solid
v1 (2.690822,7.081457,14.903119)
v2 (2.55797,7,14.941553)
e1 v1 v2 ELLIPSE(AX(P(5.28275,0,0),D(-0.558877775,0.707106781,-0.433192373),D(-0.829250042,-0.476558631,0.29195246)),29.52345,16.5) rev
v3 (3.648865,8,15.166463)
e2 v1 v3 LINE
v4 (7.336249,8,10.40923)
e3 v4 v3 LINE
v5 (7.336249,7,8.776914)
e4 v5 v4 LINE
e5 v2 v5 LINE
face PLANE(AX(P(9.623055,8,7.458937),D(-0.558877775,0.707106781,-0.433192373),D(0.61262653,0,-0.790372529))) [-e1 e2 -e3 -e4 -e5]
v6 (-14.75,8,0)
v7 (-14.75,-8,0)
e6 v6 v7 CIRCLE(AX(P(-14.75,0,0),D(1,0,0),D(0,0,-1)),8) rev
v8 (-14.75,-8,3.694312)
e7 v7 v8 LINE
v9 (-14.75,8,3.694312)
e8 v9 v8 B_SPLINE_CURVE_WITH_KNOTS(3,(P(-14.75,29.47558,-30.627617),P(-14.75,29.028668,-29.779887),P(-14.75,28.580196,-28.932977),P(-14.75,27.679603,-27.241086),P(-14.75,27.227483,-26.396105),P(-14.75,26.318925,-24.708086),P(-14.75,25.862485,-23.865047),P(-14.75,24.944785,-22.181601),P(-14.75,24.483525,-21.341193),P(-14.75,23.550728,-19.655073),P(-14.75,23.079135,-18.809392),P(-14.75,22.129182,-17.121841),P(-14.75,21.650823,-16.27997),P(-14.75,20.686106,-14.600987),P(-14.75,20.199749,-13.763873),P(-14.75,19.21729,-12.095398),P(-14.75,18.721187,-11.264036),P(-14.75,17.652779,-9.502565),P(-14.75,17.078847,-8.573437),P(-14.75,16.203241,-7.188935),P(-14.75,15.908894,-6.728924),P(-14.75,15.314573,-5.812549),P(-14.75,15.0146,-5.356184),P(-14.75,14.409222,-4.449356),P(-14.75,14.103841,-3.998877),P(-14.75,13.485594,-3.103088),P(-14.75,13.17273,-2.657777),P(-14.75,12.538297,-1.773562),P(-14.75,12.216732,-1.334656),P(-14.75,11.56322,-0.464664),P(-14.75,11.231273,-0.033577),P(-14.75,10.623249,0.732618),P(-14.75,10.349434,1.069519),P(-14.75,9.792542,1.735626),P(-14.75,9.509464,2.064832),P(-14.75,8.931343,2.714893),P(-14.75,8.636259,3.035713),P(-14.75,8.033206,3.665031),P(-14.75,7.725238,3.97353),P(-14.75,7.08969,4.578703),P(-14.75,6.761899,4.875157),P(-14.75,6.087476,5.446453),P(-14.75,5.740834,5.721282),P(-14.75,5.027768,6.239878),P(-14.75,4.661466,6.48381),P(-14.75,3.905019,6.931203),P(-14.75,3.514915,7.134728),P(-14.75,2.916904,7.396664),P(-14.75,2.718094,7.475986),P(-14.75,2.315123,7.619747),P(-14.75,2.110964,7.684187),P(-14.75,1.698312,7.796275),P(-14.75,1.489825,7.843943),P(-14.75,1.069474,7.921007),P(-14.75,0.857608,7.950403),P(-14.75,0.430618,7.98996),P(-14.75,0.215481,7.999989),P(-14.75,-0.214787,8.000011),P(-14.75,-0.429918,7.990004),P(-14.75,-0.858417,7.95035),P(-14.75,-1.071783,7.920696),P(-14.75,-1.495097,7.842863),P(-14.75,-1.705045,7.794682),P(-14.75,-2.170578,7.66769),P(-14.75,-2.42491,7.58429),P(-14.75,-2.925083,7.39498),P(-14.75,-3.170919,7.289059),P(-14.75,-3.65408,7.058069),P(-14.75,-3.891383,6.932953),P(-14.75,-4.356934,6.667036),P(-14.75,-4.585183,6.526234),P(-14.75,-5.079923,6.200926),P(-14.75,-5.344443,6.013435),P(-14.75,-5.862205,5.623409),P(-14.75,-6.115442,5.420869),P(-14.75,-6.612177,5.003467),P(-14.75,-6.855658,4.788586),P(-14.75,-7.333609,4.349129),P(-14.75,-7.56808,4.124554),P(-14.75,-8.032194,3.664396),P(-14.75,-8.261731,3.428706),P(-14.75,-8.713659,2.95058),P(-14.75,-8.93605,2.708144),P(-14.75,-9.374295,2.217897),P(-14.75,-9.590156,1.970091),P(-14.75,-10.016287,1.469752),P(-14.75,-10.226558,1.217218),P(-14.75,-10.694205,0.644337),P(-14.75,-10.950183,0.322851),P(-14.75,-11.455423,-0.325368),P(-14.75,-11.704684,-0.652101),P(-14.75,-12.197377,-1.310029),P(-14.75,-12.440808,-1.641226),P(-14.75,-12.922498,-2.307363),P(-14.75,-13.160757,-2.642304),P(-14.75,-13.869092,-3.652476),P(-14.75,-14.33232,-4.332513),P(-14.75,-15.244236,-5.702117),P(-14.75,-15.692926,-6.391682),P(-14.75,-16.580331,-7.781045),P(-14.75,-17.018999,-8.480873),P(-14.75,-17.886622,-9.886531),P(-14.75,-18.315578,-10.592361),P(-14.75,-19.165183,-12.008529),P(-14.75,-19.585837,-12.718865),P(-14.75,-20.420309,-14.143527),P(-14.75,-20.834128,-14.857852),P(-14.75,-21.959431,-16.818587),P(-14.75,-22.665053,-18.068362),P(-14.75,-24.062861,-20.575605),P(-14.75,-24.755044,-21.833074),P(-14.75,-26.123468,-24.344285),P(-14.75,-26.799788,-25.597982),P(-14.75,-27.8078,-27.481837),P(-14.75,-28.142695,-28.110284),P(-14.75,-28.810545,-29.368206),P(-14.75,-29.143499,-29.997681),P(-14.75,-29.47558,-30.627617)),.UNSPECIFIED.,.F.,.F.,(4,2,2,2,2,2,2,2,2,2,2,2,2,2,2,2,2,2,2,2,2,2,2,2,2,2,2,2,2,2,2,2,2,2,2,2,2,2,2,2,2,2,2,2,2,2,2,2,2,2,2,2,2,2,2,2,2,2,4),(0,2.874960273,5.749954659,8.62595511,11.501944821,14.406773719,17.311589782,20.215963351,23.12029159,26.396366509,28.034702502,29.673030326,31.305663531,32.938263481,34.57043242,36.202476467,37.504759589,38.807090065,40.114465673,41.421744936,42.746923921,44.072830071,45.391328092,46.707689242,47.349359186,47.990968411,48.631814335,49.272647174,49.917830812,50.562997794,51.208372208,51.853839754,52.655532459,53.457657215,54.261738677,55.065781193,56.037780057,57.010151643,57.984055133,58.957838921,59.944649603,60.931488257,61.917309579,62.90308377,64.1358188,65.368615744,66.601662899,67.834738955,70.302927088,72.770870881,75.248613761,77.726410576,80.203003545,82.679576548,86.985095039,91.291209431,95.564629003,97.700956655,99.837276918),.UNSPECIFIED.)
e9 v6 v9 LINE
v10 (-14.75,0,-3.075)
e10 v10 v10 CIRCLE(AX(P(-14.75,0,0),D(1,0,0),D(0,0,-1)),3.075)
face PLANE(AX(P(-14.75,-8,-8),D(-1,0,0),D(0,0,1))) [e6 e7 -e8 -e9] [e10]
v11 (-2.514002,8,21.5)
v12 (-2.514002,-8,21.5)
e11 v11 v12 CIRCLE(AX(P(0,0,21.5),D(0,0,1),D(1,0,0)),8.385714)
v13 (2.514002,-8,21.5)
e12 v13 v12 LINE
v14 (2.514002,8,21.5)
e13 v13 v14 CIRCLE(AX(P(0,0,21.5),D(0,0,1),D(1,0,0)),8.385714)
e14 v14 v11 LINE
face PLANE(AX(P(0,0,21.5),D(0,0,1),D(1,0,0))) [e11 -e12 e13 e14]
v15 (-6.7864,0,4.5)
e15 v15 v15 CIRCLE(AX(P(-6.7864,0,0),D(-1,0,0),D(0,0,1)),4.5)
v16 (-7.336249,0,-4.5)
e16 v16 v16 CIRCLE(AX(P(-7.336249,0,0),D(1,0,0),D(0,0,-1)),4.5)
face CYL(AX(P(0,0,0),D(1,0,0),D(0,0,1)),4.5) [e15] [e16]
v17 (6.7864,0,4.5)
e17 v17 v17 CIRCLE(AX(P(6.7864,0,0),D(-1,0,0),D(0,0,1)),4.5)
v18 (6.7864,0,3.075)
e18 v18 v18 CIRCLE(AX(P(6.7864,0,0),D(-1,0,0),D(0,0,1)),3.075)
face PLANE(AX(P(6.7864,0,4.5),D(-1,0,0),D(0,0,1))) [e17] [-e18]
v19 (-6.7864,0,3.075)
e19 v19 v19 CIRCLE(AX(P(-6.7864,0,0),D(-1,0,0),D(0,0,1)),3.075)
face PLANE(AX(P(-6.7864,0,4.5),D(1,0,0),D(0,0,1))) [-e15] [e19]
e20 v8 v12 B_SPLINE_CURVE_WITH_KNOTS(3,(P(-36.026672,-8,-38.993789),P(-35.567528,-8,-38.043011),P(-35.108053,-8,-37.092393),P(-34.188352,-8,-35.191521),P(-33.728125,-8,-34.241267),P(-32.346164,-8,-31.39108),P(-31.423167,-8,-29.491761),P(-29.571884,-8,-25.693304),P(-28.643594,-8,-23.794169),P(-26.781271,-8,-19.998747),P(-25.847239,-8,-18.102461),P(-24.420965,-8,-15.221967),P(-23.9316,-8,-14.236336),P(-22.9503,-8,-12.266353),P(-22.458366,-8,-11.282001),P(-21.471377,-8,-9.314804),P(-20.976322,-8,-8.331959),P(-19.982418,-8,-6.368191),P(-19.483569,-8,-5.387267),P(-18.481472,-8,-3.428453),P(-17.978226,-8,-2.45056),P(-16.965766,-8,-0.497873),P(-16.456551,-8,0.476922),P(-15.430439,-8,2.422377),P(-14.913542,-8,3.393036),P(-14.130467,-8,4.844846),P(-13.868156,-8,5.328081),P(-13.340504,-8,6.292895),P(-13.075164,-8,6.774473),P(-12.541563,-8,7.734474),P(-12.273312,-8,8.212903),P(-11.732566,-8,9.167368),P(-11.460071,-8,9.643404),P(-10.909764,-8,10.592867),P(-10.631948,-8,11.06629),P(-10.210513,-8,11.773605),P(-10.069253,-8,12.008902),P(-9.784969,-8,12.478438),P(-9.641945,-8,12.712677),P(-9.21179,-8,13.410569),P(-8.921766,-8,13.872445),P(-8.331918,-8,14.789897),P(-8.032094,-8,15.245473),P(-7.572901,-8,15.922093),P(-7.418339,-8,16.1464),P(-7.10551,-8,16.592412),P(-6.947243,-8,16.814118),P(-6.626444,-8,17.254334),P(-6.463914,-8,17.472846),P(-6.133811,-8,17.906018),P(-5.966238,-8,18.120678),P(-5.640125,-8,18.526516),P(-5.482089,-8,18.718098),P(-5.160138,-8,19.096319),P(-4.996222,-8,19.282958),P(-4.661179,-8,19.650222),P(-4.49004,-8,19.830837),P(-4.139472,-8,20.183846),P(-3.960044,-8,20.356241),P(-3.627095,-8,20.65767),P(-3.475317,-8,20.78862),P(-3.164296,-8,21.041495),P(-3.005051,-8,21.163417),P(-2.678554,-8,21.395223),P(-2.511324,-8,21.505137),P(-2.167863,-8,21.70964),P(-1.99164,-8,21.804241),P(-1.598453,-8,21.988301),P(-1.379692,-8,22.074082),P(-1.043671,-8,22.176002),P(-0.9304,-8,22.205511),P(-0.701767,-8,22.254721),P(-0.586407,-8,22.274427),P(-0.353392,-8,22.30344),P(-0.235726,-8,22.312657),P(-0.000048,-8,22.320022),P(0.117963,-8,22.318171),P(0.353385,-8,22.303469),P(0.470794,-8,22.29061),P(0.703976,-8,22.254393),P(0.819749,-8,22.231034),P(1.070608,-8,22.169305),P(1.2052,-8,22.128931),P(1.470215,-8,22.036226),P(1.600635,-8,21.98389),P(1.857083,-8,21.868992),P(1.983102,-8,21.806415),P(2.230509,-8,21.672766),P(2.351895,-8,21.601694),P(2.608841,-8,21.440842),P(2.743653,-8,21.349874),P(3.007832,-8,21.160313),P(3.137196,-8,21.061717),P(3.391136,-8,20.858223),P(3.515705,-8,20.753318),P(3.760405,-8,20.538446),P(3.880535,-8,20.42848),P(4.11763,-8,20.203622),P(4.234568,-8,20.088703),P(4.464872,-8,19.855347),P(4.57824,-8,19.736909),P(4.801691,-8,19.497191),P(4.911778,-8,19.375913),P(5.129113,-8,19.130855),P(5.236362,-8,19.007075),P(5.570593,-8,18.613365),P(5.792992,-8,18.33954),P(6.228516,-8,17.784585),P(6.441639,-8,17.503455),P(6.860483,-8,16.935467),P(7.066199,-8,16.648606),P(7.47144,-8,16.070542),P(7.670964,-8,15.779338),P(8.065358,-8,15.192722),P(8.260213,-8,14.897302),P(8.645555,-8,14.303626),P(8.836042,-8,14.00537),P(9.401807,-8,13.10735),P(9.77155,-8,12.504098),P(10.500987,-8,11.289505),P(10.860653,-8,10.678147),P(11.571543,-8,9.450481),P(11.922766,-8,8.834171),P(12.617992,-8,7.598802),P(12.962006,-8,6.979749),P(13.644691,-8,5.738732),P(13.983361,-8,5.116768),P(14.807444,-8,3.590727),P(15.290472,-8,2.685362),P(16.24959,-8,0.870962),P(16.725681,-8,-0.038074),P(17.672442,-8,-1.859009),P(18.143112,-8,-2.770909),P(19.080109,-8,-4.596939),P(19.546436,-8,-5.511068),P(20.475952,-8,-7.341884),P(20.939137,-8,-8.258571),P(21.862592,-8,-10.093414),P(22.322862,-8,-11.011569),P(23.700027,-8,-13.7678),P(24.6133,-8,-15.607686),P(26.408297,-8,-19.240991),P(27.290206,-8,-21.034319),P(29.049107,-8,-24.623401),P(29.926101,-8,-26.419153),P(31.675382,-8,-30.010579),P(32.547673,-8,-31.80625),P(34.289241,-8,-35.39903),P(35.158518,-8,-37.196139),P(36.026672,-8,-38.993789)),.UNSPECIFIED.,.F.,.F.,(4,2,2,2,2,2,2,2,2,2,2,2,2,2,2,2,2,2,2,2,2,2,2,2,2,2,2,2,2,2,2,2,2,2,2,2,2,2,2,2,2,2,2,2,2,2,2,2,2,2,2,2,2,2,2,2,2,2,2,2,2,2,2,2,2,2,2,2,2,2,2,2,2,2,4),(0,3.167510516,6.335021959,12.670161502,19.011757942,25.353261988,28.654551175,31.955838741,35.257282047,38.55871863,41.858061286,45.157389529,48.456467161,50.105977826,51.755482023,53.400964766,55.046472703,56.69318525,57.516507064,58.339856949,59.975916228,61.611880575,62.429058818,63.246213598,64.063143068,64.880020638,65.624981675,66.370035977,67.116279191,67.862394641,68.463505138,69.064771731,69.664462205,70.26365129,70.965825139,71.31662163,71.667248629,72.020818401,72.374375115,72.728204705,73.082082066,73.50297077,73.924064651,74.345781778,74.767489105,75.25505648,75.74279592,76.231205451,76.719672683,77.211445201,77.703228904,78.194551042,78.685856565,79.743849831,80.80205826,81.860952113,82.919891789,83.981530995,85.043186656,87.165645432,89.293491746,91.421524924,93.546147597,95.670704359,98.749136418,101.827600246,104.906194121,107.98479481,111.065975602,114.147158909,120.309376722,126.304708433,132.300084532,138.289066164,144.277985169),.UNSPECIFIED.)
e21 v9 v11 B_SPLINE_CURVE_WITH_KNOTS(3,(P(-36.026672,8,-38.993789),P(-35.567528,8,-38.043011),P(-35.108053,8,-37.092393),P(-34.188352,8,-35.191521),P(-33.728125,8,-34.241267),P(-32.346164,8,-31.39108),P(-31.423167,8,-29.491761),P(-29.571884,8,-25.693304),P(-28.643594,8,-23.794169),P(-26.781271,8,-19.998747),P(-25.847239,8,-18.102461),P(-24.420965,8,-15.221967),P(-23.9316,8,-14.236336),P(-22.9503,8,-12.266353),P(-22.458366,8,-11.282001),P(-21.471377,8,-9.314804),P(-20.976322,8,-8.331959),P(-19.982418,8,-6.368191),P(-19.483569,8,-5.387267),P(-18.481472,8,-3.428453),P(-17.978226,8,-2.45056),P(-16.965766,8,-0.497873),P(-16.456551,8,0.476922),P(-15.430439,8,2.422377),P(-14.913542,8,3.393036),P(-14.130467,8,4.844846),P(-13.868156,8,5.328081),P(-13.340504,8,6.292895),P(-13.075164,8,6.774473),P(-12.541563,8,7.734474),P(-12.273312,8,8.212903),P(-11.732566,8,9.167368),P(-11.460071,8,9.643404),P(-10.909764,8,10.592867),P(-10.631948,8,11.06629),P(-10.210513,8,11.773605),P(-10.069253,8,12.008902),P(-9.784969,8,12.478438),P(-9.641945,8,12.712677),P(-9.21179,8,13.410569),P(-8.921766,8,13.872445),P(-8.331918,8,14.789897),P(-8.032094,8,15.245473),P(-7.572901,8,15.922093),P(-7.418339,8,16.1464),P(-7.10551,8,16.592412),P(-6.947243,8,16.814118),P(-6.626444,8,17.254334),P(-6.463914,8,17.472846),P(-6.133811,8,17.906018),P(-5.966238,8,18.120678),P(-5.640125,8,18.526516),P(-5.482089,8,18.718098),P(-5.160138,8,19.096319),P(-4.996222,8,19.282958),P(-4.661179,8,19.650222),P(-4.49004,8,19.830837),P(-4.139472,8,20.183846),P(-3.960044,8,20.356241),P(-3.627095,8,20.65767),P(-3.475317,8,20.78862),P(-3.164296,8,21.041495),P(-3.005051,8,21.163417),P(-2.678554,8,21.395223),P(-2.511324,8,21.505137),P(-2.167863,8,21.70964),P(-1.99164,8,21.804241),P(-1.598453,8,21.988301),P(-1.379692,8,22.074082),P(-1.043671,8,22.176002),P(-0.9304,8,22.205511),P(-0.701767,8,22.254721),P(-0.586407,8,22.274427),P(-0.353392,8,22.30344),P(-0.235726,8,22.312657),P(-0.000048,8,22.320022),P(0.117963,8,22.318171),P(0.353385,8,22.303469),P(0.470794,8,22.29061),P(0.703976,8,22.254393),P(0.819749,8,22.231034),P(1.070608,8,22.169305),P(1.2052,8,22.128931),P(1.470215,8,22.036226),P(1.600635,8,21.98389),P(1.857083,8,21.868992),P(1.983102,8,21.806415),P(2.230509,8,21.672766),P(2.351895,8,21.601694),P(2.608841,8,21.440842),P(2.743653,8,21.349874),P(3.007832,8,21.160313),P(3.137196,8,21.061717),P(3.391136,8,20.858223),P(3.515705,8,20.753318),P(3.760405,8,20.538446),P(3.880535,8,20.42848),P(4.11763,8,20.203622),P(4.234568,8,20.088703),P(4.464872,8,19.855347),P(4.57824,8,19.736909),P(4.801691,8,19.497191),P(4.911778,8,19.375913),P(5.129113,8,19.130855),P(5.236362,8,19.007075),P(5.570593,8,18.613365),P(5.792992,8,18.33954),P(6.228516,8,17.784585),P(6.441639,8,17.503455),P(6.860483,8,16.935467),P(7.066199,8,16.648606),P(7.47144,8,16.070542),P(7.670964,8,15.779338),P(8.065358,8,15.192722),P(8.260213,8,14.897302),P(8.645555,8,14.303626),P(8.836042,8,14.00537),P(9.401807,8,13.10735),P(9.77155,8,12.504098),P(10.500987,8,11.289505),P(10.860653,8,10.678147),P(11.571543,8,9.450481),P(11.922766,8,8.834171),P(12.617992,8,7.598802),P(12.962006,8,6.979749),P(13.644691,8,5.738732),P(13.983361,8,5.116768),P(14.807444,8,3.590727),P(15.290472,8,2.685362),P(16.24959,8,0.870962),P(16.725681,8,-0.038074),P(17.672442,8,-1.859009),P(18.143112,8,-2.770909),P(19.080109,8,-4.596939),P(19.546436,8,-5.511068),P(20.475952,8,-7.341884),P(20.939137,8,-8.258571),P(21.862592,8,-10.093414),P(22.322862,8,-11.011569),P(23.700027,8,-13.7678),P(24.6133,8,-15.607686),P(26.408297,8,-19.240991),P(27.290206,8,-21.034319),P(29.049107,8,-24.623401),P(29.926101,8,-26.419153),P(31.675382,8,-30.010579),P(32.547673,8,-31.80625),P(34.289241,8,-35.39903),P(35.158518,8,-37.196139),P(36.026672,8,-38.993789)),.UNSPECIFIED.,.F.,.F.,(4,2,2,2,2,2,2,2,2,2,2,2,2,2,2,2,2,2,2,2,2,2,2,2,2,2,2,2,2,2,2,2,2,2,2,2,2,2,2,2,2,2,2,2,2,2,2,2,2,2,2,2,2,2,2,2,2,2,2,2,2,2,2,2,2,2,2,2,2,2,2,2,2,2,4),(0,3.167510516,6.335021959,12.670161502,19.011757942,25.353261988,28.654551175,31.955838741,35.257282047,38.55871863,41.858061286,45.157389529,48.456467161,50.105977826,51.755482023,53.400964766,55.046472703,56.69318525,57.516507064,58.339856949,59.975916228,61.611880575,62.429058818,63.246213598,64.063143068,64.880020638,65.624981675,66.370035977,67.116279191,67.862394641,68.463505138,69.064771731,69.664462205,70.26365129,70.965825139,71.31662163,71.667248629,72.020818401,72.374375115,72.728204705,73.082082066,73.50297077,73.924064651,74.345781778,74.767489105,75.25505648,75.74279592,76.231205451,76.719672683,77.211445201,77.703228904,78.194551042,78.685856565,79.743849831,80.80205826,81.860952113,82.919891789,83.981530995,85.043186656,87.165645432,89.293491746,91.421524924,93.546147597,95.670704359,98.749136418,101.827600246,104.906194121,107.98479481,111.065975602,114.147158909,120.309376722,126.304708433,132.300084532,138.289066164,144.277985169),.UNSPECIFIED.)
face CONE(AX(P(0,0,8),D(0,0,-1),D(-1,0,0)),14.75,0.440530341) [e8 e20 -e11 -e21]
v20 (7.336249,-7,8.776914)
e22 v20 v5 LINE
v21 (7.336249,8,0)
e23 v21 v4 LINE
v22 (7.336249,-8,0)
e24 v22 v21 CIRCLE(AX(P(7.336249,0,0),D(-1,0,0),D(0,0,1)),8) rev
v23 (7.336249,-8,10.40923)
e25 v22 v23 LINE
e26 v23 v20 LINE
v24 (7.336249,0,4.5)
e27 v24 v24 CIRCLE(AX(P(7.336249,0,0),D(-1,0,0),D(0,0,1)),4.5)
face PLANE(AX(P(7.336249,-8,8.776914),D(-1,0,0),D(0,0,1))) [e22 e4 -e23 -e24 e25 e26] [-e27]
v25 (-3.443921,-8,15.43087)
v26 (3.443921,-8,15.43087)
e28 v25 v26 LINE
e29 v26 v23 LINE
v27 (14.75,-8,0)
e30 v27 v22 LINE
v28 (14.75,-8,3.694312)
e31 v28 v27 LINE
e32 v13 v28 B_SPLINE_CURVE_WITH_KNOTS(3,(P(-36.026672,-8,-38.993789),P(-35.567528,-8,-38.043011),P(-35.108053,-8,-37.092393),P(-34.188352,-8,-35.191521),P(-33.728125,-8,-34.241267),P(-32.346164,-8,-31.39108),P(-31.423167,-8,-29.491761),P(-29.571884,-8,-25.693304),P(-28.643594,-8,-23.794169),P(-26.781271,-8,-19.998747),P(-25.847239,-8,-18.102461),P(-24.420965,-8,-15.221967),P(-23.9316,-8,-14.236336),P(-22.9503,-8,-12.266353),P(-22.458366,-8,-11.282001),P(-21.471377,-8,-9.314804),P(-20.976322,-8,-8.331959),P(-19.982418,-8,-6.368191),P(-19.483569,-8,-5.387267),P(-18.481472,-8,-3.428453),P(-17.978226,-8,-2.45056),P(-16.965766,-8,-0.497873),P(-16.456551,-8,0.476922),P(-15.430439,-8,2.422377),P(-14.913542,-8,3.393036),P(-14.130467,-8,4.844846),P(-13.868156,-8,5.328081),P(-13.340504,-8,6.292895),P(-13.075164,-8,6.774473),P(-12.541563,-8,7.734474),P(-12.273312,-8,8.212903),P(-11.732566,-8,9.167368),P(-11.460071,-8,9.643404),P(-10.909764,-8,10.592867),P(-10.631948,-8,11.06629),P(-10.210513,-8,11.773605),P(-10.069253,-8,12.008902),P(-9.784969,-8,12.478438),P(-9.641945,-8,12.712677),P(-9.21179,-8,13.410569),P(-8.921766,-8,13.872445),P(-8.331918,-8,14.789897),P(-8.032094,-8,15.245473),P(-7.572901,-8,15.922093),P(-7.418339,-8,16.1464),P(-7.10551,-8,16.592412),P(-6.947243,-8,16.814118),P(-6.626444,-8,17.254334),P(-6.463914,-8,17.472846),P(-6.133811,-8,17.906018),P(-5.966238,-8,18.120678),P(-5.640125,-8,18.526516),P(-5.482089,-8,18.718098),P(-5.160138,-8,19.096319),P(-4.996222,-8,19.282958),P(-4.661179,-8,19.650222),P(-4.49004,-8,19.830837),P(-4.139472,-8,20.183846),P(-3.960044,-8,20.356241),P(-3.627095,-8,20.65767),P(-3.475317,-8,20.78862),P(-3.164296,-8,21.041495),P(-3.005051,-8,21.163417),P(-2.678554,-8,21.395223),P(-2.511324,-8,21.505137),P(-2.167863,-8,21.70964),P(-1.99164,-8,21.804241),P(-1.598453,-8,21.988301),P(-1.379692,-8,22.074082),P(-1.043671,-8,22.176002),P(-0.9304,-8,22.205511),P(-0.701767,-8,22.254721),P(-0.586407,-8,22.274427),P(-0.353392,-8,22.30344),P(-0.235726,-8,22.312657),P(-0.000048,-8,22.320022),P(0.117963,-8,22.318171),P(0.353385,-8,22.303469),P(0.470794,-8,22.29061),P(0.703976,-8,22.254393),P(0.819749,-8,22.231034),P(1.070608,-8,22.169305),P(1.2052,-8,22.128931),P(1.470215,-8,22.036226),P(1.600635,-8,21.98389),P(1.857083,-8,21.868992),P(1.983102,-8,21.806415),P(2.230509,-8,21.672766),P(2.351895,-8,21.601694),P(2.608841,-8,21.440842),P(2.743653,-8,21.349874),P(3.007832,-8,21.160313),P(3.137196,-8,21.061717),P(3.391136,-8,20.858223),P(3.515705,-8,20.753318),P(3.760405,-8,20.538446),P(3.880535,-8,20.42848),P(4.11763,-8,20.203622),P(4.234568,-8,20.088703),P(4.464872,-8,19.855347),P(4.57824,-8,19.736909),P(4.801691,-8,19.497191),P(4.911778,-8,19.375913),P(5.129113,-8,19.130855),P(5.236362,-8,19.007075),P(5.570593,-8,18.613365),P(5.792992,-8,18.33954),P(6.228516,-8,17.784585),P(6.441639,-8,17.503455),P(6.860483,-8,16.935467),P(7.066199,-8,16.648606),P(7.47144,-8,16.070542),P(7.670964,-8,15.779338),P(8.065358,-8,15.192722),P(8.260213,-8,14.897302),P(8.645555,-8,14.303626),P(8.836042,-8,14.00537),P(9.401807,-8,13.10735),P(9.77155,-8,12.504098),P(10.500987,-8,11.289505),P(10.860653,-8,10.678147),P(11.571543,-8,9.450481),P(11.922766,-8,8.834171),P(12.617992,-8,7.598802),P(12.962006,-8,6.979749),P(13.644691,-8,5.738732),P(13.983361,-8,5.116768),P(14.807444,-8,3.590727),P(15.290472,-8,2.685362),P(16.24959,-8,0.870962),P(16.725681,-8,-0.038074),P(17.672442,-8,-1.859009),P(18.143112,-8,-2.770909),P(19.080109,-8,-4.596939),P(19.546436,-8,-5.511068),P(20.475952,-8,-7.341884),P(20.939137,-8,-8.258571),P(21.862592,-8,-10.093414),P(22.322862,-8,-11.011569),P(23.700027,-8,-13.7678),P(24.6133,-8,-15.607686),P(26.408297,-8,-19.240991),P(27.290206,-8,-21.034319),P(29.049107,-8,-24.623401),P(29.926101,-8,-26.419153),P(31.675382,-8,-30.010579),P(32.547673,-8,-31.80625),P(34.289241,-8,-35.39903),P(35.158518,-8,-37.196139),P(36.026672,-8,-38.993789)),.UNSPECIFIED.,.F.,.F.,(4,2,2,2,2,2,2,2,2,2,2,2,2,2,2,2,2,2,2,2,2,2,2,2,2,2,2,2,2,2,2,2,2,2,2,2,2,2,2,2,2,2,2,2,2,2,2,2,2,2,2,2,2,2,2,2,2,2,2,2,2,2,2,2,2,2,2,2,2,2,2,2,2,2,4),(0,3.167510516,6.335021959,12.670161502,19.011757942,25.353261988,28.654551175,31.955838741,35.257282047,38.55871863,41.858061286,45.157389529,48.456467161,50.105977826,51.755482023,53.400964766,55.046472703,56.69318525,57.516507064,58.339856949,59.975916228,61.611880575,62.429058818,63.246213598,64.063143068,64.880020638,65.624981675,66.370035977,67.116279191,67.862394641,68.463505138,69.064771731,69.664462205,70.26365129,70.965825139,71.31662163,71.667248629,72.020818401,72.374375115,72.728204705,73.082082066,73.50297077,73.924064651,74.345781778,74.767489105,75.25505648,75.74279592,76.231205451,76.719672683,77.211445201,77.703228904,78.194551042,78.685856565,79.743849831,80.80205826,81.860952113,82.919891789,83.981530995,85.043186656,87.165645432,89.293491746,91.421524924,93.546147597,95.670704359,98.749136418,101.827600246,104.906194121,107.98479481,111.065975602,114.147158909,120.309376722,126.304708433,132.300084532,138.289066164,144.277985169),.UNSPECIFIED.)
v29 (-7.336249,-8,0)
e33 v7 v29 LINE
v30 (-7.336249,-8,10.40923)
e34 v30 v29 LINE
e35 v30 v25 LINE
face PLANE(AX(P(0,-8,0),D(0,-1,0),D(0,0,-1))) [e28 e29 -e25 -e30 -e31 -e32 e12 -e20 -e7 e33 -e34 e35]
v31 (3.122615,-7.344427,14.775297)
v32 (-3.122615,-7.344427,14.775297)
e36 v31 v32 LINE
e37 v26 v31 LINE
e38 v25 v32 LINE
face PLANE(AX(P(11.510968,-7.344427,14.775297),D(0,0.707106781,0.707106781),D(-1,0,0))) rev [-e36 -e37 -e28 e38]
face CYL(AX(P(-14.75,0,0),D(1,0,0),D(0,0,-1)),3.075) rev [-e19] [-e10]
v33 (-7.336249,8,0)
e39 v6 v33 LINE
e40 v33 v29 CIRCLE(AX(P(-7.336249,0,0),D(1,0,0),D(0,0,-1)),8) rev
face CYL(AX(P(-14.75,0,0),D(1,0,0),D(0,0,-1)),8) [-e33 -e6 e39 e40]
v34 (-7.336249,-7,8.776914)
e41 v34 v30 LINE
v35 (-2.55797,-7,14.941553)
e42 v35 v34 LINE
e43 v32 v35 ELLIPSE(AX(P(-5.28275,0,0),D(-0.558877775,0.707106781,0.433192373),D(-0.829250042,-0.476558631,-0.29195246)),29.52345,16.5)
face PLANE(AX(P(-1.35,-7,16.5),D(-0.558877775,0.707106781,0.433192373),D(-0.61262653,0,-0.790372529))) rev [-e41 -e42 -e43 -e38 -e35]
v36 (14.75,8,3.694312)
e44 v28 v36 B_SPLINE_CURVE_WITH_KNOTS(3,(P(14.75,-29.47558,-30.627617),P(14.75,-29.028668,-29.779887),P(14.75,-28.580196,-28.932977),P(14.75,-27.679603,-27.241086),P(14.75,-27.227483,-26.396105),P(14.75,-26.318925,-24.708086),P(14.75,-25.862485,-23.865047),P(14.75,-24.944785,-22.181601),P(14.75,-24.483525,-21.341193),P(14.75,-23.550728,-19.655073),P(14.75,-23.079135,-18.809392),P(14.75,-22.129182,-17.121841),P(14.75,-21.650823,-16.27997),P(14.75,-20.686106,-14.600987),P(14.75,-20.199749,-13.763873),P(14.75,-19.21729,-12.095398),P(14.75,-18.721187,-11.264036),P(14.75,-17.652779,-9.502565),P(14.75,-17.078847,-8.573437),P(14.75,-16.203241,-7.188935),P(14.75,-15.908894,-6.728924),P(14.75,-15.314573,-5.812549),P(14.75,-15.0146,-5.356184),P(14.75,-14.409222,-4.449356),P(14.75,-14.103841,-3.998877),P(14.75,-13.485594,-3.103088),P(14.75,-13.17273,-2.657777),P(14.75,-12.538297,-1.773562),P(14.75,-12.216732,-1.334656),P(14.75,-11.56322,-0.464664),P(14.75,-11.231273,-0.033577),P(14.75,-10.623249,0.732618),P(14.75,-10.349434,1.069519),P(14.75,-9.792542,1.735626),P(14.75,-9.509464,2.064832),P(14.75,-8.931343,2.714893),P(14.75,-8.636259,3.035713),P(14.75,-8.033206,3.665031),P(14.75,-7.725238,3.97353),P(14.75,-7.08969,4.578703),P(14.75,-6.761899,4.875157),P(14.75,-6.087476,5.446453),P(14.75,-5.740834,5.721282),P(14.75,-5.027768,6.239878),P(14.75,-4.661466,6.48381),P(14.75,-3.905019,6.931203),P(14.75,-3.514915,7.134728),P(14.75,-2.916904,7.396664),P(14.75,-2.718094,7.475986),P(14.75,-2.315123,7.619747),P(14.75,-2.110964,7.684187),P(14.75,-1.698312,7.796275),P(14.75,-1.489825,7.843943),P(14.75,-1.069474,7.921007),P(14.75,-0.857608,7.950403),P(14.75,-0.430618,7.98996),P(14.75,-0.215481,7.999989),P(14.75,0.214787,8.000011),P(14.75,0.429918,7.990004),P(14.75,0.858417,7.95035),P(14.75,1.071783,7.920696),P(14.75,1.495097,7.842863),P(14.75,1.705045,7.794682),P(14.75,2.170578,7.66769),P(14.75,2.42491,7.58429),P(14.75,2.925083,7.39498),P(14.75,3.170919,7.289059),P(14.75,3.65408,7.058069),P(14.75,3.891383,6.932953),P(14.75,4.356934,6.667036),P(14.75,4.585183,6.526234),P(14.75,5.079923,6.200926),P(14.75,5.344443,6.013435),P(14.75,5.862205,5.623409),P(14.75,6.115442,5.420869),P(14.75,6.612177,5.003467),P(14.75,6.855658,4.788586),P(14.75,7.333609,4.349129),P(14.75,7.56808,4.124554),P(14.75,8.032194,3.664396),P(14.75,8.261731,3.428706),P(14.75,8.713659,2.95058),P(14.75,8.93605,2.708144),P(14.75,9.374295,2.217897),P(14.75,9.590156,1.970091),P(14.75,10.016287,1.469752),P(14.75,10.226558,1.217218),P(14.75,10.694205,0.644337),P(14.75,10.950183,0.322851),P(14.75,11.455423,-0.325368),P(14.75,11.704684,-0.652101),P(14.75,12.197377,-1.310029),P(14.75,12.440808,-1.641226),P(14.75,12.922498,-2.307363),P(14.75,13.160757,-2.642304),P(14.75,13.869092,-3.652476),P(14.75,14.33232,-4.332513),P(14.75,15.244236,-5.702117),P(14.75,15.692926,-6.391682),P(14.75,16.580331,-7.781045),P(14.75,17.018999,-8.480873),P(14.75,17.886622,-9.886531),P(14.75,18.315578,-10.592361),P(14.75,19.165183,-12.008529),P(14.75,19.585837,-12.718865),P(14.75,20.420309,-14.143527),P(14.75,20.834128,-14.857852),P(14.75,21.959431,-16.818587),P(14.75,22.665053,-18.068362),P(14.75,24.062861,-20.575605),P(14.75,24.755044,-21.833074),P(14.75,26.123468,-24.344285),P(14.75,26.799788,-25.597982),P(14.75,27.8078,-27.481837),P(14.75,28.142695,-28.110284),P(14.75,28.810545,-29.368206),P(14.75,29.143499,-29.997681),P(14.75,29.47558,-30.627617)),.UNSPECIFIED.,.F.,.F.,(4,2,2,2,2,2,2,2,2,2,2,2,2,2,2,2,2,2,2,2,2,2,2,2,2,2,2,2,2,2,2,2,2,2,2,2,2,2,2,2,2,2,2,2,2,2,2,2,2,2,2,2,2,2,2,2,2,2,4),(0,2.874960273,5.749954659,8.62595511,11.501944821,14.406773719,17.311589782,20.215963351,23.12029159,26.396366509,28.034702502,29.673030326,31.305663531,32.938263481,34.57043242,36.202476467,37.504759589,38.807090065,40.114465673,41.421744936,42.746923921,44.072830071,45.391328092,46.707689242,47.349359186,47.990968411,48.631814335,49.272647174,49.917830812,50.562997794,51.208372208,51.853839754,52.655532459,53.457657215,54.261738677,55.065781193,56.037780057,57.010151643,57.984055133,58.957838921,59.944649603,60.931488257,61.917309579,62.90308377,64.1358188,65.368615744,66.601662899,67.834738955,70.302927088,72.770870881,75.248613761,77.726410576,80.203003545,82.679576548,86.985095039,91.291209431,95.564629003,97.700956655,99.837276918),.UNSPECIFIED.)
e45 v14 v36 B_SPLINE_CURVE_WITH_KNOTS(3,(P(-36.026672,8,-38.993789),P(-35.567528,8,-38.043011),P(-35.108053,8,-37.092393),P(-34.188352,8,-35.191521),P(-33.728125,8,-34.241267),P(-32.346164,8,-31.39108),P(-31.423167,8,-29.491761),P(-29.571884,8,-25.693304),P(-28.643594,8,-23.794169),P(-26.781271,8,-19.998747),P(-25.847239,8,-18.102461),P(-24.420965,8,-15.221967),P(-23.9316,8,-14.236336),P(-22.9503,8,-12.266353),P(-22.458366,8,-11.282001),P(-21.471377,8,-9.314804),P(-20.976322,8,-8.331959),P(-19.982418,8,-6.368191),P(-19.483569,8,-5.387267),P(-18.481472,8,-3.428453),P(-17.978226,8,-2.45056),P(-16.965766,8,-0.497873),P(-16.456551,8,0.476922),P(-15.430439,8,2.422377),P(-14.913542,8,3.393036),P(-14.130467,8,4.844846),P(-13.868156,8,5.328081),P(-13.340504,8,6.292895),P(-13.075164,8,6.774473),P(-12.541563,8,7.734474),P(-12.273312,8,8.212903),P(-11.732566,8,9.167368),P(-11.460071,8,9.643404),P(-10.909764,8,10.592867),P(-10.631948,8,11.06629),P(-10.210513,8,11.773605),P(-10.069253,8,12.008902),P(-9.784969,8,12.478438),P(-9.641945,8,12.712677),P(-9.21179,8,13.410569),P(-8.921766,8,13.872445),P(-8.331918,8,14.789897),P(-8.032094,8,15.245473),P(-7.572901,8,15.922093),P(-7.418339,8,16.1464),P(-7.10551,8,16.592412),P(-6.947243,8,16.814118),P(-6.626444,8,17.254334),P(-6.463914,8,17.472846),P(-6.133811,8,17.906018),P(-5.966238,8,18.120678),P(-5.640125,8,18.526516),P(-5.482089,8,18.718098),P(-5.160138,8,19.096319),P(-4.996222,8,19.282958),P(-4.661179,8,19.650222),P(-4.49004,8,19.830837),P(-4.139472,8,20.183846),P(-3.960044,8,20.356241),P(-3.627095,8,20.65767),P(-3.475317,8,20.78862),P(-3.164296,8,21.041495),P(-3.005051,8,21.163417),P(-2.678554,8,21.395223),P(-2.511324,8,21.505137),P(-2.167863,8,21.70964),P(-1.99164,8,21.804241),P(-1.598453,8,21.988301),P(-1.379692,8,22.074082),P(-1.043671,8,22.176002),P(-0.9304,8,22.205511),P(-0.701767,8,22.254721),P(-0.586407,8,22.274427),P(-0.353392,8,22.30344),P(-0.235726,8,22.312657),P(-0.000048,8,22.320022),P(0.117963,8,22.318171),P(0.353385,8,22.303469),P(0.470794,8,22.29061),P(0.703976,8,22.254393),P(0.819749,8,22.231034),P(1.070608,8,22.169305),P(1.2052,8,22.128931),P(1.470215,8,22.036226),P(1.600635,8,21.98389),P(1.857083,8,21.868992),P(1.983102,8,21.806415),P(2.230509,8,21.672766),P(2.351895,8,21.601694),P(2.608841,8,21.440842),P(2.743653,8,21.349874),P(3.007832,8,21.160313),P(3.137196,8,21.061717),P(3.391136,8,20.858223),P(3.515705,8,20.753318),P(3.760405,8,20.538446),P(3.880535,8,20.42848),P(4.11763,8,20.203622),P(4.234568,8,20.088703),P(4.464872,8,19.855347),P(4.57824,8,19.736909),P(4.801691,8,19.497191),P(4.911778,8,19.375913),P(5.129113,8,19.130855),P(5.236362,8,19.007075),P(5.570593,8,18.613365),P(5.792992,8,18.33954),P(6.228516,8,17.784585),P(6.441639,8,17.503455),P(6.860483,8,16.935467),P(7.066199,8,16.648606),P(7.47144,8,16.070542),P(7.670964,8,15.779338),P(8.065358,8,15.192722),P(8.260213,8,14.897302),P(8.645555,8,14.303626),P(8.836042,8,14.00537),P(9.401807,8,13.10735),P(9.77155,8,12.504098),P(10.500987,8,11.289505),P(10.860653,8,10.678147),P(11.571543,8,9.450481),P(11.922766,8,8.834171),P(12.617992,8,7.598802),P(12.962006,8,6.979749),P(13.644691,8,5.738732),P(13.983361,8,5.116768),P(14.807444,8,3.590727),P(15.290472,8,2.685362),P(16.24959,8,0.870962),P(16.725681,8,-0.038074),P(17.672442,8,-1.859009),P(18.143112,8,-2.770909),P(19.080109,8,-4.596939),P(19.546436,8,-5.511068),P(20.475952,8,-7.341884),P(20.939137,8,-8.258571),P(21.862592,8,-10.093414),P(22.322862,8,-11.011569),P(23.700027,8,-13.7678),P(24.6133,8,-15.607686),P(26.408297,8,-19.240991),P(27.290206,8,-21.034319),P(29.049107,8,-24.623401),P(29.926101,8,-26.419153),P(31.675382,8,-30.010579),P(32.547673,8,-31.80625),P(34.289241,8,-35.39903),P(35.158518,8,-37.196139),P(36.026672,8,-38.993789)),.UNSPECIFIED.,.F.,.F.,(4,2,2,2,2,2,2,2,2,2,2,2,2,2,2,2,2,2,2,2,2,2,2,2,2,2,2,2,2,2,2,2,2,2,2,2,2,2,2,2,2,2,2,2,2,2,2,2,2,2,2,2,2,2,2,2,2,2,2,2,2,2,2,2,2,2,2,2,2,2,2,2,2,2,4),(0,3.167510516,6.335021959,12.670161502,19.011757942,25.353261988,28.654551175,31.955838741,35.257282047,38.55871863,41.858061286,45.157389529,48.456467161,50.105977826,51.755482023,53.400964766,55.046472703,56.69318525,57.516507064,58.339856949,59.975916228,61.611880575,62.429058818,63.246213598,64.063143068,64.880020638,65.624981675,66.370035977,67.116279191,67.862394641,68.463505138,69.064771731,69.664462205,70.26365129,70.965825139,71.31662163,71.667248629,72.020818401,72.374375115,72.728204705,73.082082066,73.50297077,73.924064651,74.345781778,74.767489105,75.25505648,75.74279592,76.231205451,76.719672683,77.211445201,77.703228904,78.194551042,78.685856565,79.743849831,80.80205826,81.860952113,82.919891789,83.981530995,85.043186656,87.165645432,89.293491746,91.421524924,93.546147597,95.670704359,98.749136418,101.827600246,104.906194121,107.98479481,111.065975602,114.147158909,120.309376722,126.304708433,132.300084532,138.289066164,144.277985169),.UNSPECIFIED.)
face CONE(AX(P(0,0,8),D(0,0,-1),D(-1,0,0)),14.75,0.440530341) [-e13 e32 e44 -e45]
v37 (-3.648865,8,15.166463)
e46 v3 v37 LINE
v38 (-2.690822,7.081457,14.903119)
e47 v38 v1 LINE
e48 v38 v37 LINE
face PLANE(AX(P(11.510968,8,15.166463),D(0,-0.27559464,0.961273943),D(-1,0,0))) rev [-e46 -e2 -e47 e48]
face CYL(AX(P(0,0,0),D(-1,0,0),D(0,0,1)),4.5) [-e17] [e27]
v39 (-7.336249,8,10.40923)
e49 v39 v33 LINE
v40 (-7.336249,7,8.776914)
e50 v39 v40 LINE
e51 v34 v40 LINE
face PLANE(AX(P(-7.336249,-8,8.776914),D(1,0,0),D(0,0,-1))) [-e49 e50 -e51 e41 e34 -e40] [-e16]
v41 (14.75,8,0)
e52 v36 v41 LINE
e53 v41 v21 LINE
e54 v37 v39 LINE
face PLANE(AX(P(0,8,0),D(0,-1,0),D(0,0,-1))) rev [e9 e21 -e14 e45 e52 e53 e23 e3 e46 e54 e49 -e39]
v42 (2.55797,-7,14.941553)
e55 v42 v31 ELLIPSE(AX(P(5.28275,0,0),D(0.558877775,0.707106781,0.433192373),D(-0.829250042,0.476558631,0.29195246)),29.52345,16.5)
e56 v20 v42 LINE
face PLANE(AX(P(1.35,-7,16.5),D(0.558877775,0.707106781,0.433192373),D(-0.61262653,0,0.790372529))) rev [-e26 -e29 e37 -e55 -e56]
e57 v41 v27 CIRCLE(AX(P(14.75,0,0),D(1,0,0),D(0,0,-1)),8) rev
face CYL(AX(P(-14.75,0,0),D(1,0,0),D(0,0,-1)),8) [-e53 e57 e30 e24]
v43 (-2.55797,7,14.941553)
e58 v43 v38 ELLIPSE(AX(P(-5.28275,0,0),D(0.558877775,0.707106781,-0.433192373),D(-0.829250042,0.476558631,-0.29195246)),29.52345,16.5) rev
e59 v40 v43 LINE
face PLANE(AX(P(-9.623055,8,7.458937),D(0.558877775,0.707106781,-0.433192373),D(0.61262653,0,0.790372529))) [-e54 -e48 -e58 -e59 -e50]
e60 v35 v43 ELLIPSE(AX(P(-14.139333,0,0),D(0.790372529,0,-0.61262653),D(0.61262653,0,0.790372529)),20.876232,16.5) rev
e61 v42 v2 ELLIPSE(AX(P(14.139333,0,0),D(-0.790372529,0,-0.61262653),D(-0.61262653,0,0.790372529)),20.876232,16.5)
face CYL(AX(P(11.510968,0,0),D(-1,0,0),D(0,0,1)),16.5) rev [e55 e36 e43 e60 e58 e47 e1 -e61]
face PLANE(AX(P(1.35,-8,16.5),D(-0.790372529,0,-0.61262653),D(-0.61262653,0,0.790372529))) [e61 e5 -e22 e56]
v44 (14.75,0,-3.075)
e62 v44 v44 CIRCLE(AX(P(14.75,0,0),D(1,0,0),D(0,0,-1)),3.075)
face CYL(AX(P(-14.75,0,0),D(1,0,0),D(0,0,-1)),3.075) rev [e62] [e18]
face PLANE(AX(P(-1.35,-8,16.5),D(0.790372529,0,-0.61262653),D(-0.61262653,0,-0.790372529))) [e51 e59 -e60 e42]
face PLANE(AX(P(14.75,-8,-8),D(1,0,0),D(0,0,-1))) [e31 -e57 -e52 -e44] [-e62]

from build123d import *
from OCP.BRepFilletAPI import BRepFilletAPI_MakeChamfer

# Parameters (mm, degrees)
BOSS_EXTRUDE1_DEPTH             = 8
BOSS_EXTRUDE1_DEPTH_BACK        = 8
CUT_EXTRUDE1_DEPTH              = 31.525604007
CUT_EXTRUDE1_DEPTH_BACK         = 31.525604007
SKETCH2_R                       = 3.075
SKETCH4_W                       = 0.549849448
SKETCH4_H                       = 1.425
BOSS_EXTRUDE2_REACH             = 32.526
BOSS_EXTRUDE2_DIRECTION_2_REACH = 32.526
CUT_EXTRUDE3_DEPTH              = 38.467485904
CUT_EXTRUDE3_DEPTH_BACK         = 4
SKETCH12_R                      = 2
CHAMFER1_SIZE                   = 0.5
CHAMFER1_SIZE2                  = 1.045792293
CHAMFER2_SIZE                   = 1
CHAMFER2_SIZE_2                 = 0.735593413


with BuildPart() as part:
    # Sketch1 → Boss-Extrude1 (new, two sides: drawn at the far end of the back side and taken through both)
    with BuildSketch(Plane(origin=(0, 0, 0), x_dir=(1, 0, 0), z_dir=(0, 1, 0)).offset(-BOSS_EXTRUDE1_DEPTH_BACK)):
        Polygon((-7.336249448, 8), (-14.75, 8), (-14.75, -8), (-6.5, -25.5), (6.5, -25.5), (14.75, -8), (14.75, 8), (7.336249448, 8), (7.336249448, -8.776914416), (1.35, -16.5), (-1.35, -16.5), (-7.336249448, -8.776914416), align=None)
    extrude(amount=BOSS_EXTRUDE1_DEPTH + BOSS_EXTRUDE1_DEPTH_BACK)

    # Sketch2 → Cut-Extrude1 (cut, two sides: drawn at the far end of the back side and taken through both)
    with BuildSketch(Plane(origin=(0, 0, 0), x_dir=(0, 0, -1), z_dir=(1, 0, 0)).offset(-CUT_EXTRUDE1_DEPTH_BACK)):
        with BuildLine():
            ThreePointArc((8, -9e-09), (5.656854246, -5.656854253), (0, -8))
            Line((0, -8), (8, -8))
            Line((8, -8), (8, -9e-09))
        make_face()
        with BuildLine():
            ThreePointArc((0, 8), (5.656854253, 5.656854246), (8, -9e-09))
            Line((8, -9e-09), (8, 8))
            Line((8, 8), (0, 8))
        make_face()
        Circle(SKETCH2_R)
    extrude(amount=CUT_EXTRUDE1_DEPTH + CUT_EXTRUDE1_DEPTH_BACK, mode=Mode.SUBTRACT)

    # Sketch4 → Revolve2 (revolve)
    with BuildSketch(Plane(origin=(0, 0, 0), x_dir=(1, 0, 0), z_dir=(0, 1, 0)), mode=Mode.PRIVATE) as revolve2_sk:
        with Locations((7.061324724, -3.7875)):
            Rectangle(SKETCH4_W, SKETCH4_H)
    revolve2 = revolve(revolve2_sk.sketch.rotate(Axis((0, 0, 0), (1, 0, 0)), 180), axis=Axis((0, 0, 0), (1, 0, 0)))

    # Mirror1: Revolve2 across plane
    add(revolve2.mirror(Plane(origin=(0, 0, 0), x_dir=(0, 0, 1), z_dir=(1, 0, 0))))

    # Sketch8 → Cut-Revolve2 (revolve, cut)
    with BuildSketch(Plane(origin=(0, 0, 0), x_dir=(1, 0, 0), z_dir=(0, 1, 0)), mode=Mode.PRIVATE) as cut_revolve2_sk:
        Polygon((6.5, -25.5), (14.75, -8), (39.633624851, 44.783446654), (108.512816048, 26.763980306), (108.512816048, -25.5), align=None)
    revolve(cut_revolve2_sk.sketch.rotate(Axis((0, 0, 16.5), (0, 0, -1)), 208.474191333), axis=Axis((0, 0, 16.5), (0, 0, -1)), mode=Mode.SUBTRACT)

    # Boss-Extrude2: up to this plane
    boss_extrude2_end = Plane(origin=(1.35, -8, 16.5), z_dir=(-0.7903725294702838, 0, -0.6126265295094112))
    # Sketch9 → Boss-Extrude2 (add, up to the surface)
    with BuildSketch(Plane(origin=(0, 0, 0), x_dir=(0, 0, -1), z_dir=(1, 0, 0)), mode=Mode.PRIVATE) as boss_extrude2_sk1:
        with BuildLine():
            Line((-16.5, -9e-08), (-16.5, -8))
            Line((-16.5, -8), (-14.43086969, -8))
            ThreePointArc((-14.43086969, -8), (-15.974344261, -4.131625034), (-16.5, -9e-08))
        make_face()
    boss_extrude2_tool1 = split(extrude(boss_extrude2_sk1.sketch, amount=BOSS_EXTRUDE2_REACH, mode=Mode.PRIVATE), bisect_by=boss_extrude2_end, keep=Keep.BOTH, mode=Mode.PRIVATE)
    add(boss_extrude2_tool1.solids().sort_by_distance((0, -6.025945, 15.886555))[0])
    # Sketch9 → Boss-Extrude2 (add, up to the surface)
    with BuildSketch(Plane(origin=(0, 0, 0), x_dir=(0, 0, -1), z_dir=(1, 0, 0)), mode=Mode.PRIVATE) as boss_extrude2_sk2:
        with BuildLine():
            Line((-16.5, 8), (-16.5, -9e-08))
            ThreePointArc((-16.5, -9e-08), (-15.974344284, 4.131624947), (-14.43086969, 8))
            Line((-14.43086969, 8), (-16.5, 8))
        make_face()
    boss_extrude2_tool2 = split(extrude(boss_extrude2_sk2.sketch, amount=BOSS_EXTRUDE2_REACH, mode=Mode.PRIVATE), bisect_by=boss_extrude2_end, keep=Keep.BOTH, mode=Mode.PRIVATE)
    add(boss_extrude2_tool2.solids().sort_by_distance((0, 6.025945, 15.886555))[0])

    # Boss-Extrude2 direction 2: up to this plane
    boss_extrude2_direction_2_end = Plane(origin=(-1.35, -8, 16.5), z_dir=(0.7903725294702839, 0, -0.612626529509411))
    # Sketch9 → Boss-Extrude2 direction 2 (add, up to the surface)
    with BuildSketch(Plane(origin=(0, 0, 0), x_dir=(0, 0, -1), z_dir=(1, 0, 0)), mode=Mode.PRIVATE) as boss_extrude2_direction_2_sk1:
        with BuildLine():
            Line((-16.5, -9e-08), (-16.5, -8))
            Line((-16.5, -8), (-14.43086969, -8))
            ThreePointArc((-14.43086969, -8), (-15.974344261, -4.131625034), (-16.5, -9e-08))
        make_face()
    boss_extrude2_direction_2_tool1 = split(extrude(boss_extrude2_direction_2_sk1.sketch, amount=-BOSS_EXTRUDE2_DIRECTION_2_REACH, mode=Mode.PRIVATE), bisect_by=boss_extrude2_direction_2_end, keep=Keep.BOTH, mode=Mode.PRIVATE)
    add(boss_extrude2_direction_2_tool1.solids().sort_by_distance((0, -6.025945, 15.886555))[0])
    # Sketch9 → Boss-Extrude2 direction 2 (add, up to the surface)
    with BuildSketch(Plane(origin=(0, 0, 0), x_dir=(0, 0, -1), z_dir=(1, 0, 0)), mode=Mode.PRIVATE) as boss_extrude2_direction_2_sk2:
        with BuildLine():
            Line((-16.5, 8), (-16.5, -9e-08))
            ThreePointArc((-16.5, -9e-08), (-15.974344284, 4.131624947), (-14.43086969, 8))
            Line((-14.43086969, 8), (-16.5, 8))
        make_face()
    boss_extrude2_direction_2_tool2 = split(extrude(boss_extrude2_direction_2_sk2.sketch, amount=-BOSS_EXTRUDE2_DIRECTION_2_REACH, mode=Mode.PRIVATE), bisect_by=boss_extrude2_direction_2_end, keep=Keep.BOTH, mode=Mode.PRIVATE)
    add(boss_extrude2_direction_2_tool2.solids().sort_by_distance((0, 6.025945, 15.886555))[0])

    # Sketch12 → Cut-Extrude3 (cut, two sides: drawn at the far end of the back side and taken through both)
    with BuildSketch(Plane.XY.offset(25.5).offset(-CUT_EXTRUDE3_DEPTH_BACK)):
        with Locations(Location((0, 0, 0), (0, 0, 180))):
            Circle(SKETCH12_R)
    extrude(amount=CUT_EXTRUDE3_DEPTH + CUT_EXTRUDE3_DEPTH_BACK, mode=Mode.SUBTRACT)

    # Chamfer1: one chamfer whose edges measure the first distance from different faces: ONE call of the kernel's chamfer builder (chamfer() names one face for all edges)
    chamfer1_edges_1 = [part.edges().sort_by_distance(p)[0] for p in [
        (5.713707726, -3.098958538, 25.5),
    ]]
    chamfer1_side_1 = [part.faces().sort_by_distance(p)[0] for p in [
        (10.231854722, -5.54947769, 14.597156153),
    ]]
    chamfer1_edges_2 = [part.edges().sort_by_distance(p)[0] for p in [
        (2, 0, 25.5),
    ]]
    chamfer1 = BRepFilletAPI_MakeChamfer(part.part.solid().wrapped)
    for e in chamfer1_edges_1:
        chamfer1.Add(CHAMFER1_SIZE, CHAMFER1_SIZE2, e.wrapped, chamfer1_side_1[0].wrapped)  # the first distance lies on this face
    for e in chamfer1_edges_2:
        chamfer1.Add(CHAMFER1_SIZE, e.wrapped)
    add(Compound.cast(chamfer1.Shape()), mode=Mode.REPLACE)

    # Chamfer2
    # the kernel refuses this chamfer: 1, 0.735593413 mm, written as the material it takes off along each edge
    with BuildSketch(Plane(origin=(8.911730672, 8, 6.744326828), x_dir=(0.7903725294702837, 0, 0.6126265295094113), z_dir=(-0.6126265295094113, 0, 0.7903725294702838))) as chamfer2_piece_1_section:
        Polygon((CHAMFER2_SIZE, 0), (0, -CHAMFER2_SIZE), (0, 0), align=None)
    chamfer2_piece_1 = extrude(amount=12.296898092, mode=Mode.PRIVATE)
    chamfer2_piece_1 = split(chamfer2_piece_1, bisect_by=Plane(origin=(7.336249448, 8, 6.744326828), z_dir=(-1, 0, 0)), keep=Keep.TOP, mode=Mode.PRIVATE)
    chamfer2_piece_1 = chamfer2_piece_1 & Plane(origin=(8.911730672, 0, 0), x_dir=(0, -5.438658574002453e-09, 1.0), z_dir=(-1, 0, 0)) * Cylinder(16.5, 29, mode=Mode.PRIVATE)
    add(chamfer2_piece_1, mode=Mode.SUBTRACT)
    with BuildSketch(Plane(origin=(8.911730672, -8, 6.744326828), x_dir=(0.7903725294702837, 0, 0.6126265295094113), z_dir=(-0.6126265295094113, 0, 0.7903725294702838))) as chamfer2_piece_2_section:
        Polygon((CHAMFER2_SIZE, 0), (0, CHAMFER2_SIZE), (0, 0), align=None)
    chamfer2_piece_2 = extrude(amount=12.296898092, mode=Mode.PRIVATE)
    chamfer2_piece_2 = split(chamfer2_piece_2, bisect_by=Plane(origin=(7.336249448, -8, 6.744326828), z_dir=(-1, 0, 0)), keep=Keep.TOP, mode=Mode.PRIVATE)
    chamfer2_piece_2 = chamfer2_piece_2 & Plane(origin=(8.911730672, 0, 0), x_dir=(0, -0.48484848484848475, 0.8745981630098069), z_dir=(-1, 0, 0)) * Cylinder(16.5, 29, mode=Mode.PRIVATE)
    add(chamfer2_piece_2, mode=Mode.SUBTRACT)
    with BuildSketch(Plane(origin=(-1.37832467, 8, 16.463457278), x_dir=(-0.7903725294702839, 0, 0.6126265295094111), z_dir=(-0.6126265295094111, 0, -0.7903725294702839))) as chamfer2_piece_3_section:
        Polygon((CHAMFER2_SIZE, 0), (0, -CHAMFER2_SIZE), (0, 0), align=None)
    chamfer2_piece_3 = extrude(amount=12.296898092, mode=Mode.PRIVATE)
    chamfer2_piece_3 = split(chamfer2_piece_3, bisect_by=Plane(origin=(-7.336249448, 8, 16.463457278), z_dir=(1, 0, 0)), keep=Keep.TOP, mode=Mode.PRIVATE)
    chamfer2_piece_3 = chamfer2_piece_3 & Plane(origin=(-1.37832467, 0, 0), x_dir=(0, -5.438658574002453e-09, 1.0), z_dir=(1, 0, 0)) * Cylinder(16.5, 29, mode=Mode.PRIVATE)
    add(chamfer2_piece_3, mode=Mode.SUBTRACT)
    with BuildSketch(Plane(origin=(-1.37832467, -8, 16.463457278), x_dir=(-0.7903725294702838, 0, 0.6126265295094111), z_dir=(-0.6126265295094111, 0, -0.7903725294702839))) as chamfer2_piece_4_section:
        Polygon((CHAMFER2_SIZE, 0), (0, CHAMFER2_SIZE), (0, 0), align=None)
    chamfer2_piece_4 = extrude(amount=12.296898092, mode=Mode.PRIVATE)
    chamfer2_piece_4 = chamfer2_piece_4 & Plane(origin=(-1.37832467, 0, 0), x_dir=(0, -0.48484848484848475, 0.8745981630098069), z_dir=(1, 0, 0)) * Cylinder(16.5, 29, mode=Mode.PRIVATE)
    chamfer2_piece_4 = split(chamfer2_piece_4, bisect_by=Plane(origin=(-7.336249448, -8, 16.463457278), z_dir=(1, 0, 0)), keep=Keep.TOP, mode=Mode.PRIVATE)
    add(chamfer2_piece_4, mode=Mode.SUBTRACT)
    with BuildSketch(Plane(origin=(0, 8, 14.43086969), x_dir=(0, 0, 1), z_dir=(-1, 0, 0))) as chamfer2_piece_5_section:
        with BuildLine():
            Line((CHAMFER2_SIZE_2, 0), (0.47224964, -0.918542928))
            ThreePointArc((0.47224964, -0.918542928), (0.2499823, -0.46856024), (0, 0))
            Line((0, 0), (CHAMFER2_SIZE_2, 0))
        make_face()
    chamfer2_piece_5 = extrude(amount=5.609656259, mode=Mode.PRIVATE)
    chamfer2_piece_5 = split(chamfer2_piece_5, bisect_by=Plane(origin=(-1.845209268, 8, 15.861111896), z_dir=(0.7903725294702839, 0, -0.6126265295094111)), keep=Keep.TOP, mode=Mode.PRIVATE)
    add(chamfer2_piece_5, mode=Mode.SUBTRACT)
    with BuildSketch(Plane(origin=(0, -8, 14.43086969), x_dir=(0, 0, 1), z_dir=(-1, 0, 0))) as chamfer2_piece_6_section:
        with BuildLine():
            Line((CHAMFER2_SIZE, 0), (0.344426995, 0.655573005))
            ThreePointArc((0.344426995, 0.655573005), (0.17865839, 0.331122032), (0, 0))
            Line((0, 0), (CHAMFER2_SIZE, 0))
        make_face()
    chamfer2_piece_6 = extrude(amount=5.525488882, mode=Mode.PRIVATE)
    chamfer2_piece_6 = split(chamfer2_piece_6, bisect_by=Plane(origin=(-1.845209268, -8, 15.861111896), z_dir=(0.7903725294702839, 0, -0.6126265295094111)), keep=Keep.TOP, mode=Mode.PRIVATE)
    add(chamfer2_piece_6, mode=Mode.SUBTRACT)
    with BuildSketch(Plane(origin=(0, -8, 14.43086969), x_dir=(0, 0, 1), z_dir=(1, 0, 0))) as chamfer2_piece_7_section:
        with BuildLine():
            Line((CHAMFER2_SIZE, 0), (0.344426995, -0.655573005))
            ThreePointArc((0.344426995, -0.655573005), (0.17865839, -0.331122032), (0, 0))
            Line((0, 0), (CHAMFER2_SIZE, 0))
        make_face()
    chamfer2_piece_7 = extrude(amount=5.525488882, mode=Mode.PRIVATE)
    chamfer2_piece_7 = split(chamfer2_piece_7, bisect_by=Plane(origin=(1.845209268, -8, 15.861111896), z_dir=(-0.7903725294702837, 0, -0.6126265295094113)), keep=Keep.TOP, mode=Mode.PRIVATE)
    add(chamfer2_piece_7, mode=Mode.SUBTRACT)
    with BuildSketch(Plane(origin=(0, 8, 14.43086969), x_dir=(0, 0, 1), z_dir=(1, 0, 0))) as chamfer2_piece_8_section:
        with BuildLine():
            Line((CHAMFER2_SIZE_2, 0), (0.47224964, 0.918542928))
            ThreePointArc((0.47224964, 0.918542928), (0.2499823, 0.46856024), (0, 0))
            Line((0, 0), (CHAMFER2_SIZE_2, 0))
        make_face()
    chamfer2_piece_8 = extrude(amount=5.609656259, mode=Mode.PRIVATE)
    chamfer2_piece_8 = split(chamfer2_piece_8, bisect_by=Plane(origin=(1.845209268, 8, 15.861111896), z_dir=(-0.7903725294702837, 0, -0.6126265295094113)), keep=Keep.TOP, mode=Mode.PRIVATE)
    add(chamfer2_piece_8, mode=Mode.SUBTRACT)
    with BuildSketch(Plane(origin=(8.911730672, 8, 6.744326828), x_dir=(0.7903725294702837, 0, 0.6126265295094113), z_dir=(-0.6126265295094113, 0, 0.7903725294702838))) as chamfer2_piece_9a_section:
        Polygon((CHAMFER2_SIZE, 0), (0, -CHAMFER2_SIZE), (0, 0), align=None)
    chamfer2_piece_9a = extrude(amount=12.296898092, mode=Mode.PRIVATE)
    chamfer2_piece_9a = chamfer2_piece_9a - Plane(origin=(8.911730672, 0, 0), x_dir=(0, -5.438658574002453e-09, 1.0), z_dir=(-1, 0, 0)) * Cylinder(16.5, 29, mode=Mode.PRIVATE)
    with BuildSketch(Plane(origin=(0, 8, 14.43086969), x_dir=(0, 0, 1), z_dir=(1, 0, 0))) as chamfer2_piece_9b_section:
        with BuildLine():
            Line((CHAMFER2_SIZE_2, 0), (0.47224964, 0.918542928))
            ThreePointArc((0.47224964, 0.918542928), (0.2499823, 0.46856024), (0, 0))
            Line((0, 0), (CHAMFER2_SIZE_2, 0))
        make_face()
    chamfer2_piece_9b = extrude(amount=5.609656259, mode=Mode.PRIVATE)
    chamfer2_piece_9b = split(chamfer2_piece_9b, bisect_by=Plane(origin=(1.845209268, 8, 15.861111896), z_dir=(0.7903725294702837, 0, 0.6126265295094113)), keep=Keep.TOP, mode=Mode.PRIVATE)
    chamfer2_piece_9 = chamfer2_piece_9a & chamfer2_piece_9b
    add(chamfer2_piece_9, mode=Mode.SUBTRACT)
    with BuildSketch(Plane(origin=(8.911730672, -8, 6.744326828), x_dir=(0.7903725294702837, 0, 0.6126265295094113), z_dir=(-0.6126265295094113, 0, 0.7903725294702838))) as chamfer2_piece_10a_section:
        Polygon((CHAMFER2_SIZE, 0), (0, CHAMFER2_SIZE), (0, 0), align=None)
    chamfer2_piece_10a = extrude(amount=12.296898092, mode=Mode.PRIVATE)
    chamfer2_piece_10a = chamfer2_piece_10a - Plane(origin=(8.911730672, 0, 0), x_dir=(0, -0.48484848484848475, 0.8745981630098069), z_dir=(-1, 0, 0)) * Cylinder(16.5, 29, mode=Mode.PRIVATE)
    with BuildSketch(Plane(origin=(0, -8, 14.43086969), x_dir=(0, 0, 1), z_dir=(1, 0, 0))) as chamfer2_piece_10b_section:
        with BuildLine():
            Line((CHAMFER2_SIZE, 0), (0.344426995, -0.655573005))
            ThreePointArc((0.344426995, -0.655573005), (0.17865839, -0.331122032), (0, 0))
            Line((0, 0), (CHAMFER2_SIZE, 0))
        make_face()
    chamfer2_piece_10b = extrude(amount=5.525488882, mode=Mode.PRIVATE)
    chamfer2_piece_10b = split(chamfer2_piece_10b, bisect_by=Plane(origin=(1.845209268, -8, 15.861111896), z_dir=(0.7903725294702837, 0, 0.6126265295094113)), keep=Keep.TOP, mode=Mode.PRIVATE)
    chamfer2_piece_10 = chamfer2_piece_10a & chamfer2_piece_10b
    add(chamfer2_piece_10, mode=Mode.SUBTRACT)
    with BuildSketch(Plane(origin=(-1.37832467, 8, 16.463457278), x_dir=(-0.7903725294702839, 0, 0.6126265295094111), z_dir=(-0.6126265295094111, 0, -0.7903725294702839))) as chamfer2_piece_11a_section:
        Polygon((CHAMFER2_SIZE, 0), (0, -CHAMFER2_SIZE), (0, 0), align=None)
    chamfer2_piece_11a = extrude(amount=12.296898092, mode=Mode.PRIVATE)
    chamfer2_piece_11a = chamfer2_piece_11a - Plane(origin=(-1.37832467, 0, 0), x_dir=(0, -5.438658574002453e-09, 1.0), z_dir=(1, 0, 0)) * Cylinder(16.5, 29, mode=Mode.PRIVATE)
    with BuildSketch(Plane(origin=(0, 8, 14.43086969), x_dir=(0, 0, 1), z_dir=(-1, 0, 0))) as chamfer2_piece_11b_section:
        with BuildLine():
            Line((CHAMFER2_SIZE_2, 0), (0.47224964, -0.918542928))
            ThreePointArc((0.47224964, -0.918542928), (0.2499823, -0.46856024), (0, 0))
            Line((0, 0), (CHAMFER2_SIZE_2, 0))
        make_face()
    chamfer2_piece_11b = extrude(amount=5.609656259, mode=Mode.PRIVATE)
    chamfer2_piece_11b = split(chamfer2_piece_11b, bisect_by=Plane(origin=(-1.845209268, 8, 15.861111896), z_dir=(-0.7903725294702839, 0, 0.6126265295094111)), keep=Keep.TOP, mode=Mode.PRIVATE)
    chamfer2_piece_11 = chamfer2_piece_11a & chamfer2_piece_11b
    add(chamfer2_piece_11, mode=Mode.SUBTRACT)
    with BuildSketch(Plane(origin=(-1.37832467, -8, 16.463457278), x_dir=(-0.7903725294702838, 0, 0.6126265295094111), z_dir=(-0.6126265295094111, 0, -0.7903725294702839))) as chamfer2_piece_12a_section:
        Polygon((CHAMFER2_SIZE, 0), (0, CHAMFER2_SIZE), (0, 0), align=None)
    chamfer2_piece_12a = extrude(amount=12.296898092, mode=Mode.PRIVATE)
    chamfer2_piece_12a = chamfer2_piece_12a - Plane(origin=(-1.37832467, 0, 0), x_dir=(0, -0.48484848484848475, 0.8745981630098069), z_dir=(1, 0, 0)) * Cylinder(16.5, 29, mode=Mode.PRIVATE)
    with BuildSketch(Plane(origin=(0, -8, 14.43086969), x_dir=(0, 0, 1), z_dir=(-1, 0, 0))) as chamfer2_piece_12b_section:
        with BuildLine():
            Line((CHAMFER2_SIZE, 0), (0.344426995, 0.655573005))
            ThreePointArc((0.344426995, 0.655573005), (0.17865839, 0.331122032), (0, 0))
            Line((0, 0), (CHAMFER2_SIZE, 0))
        make_face()
    chamfer2_piece_12b = extrude(amount=5.525488882, mode=Mode.PRIVATE)
    chamfer2_piece_12b = split(chamfer2_piece_12b, bisect_by=Plane(origin=(-1.845209268, -8, 15.861111896), z_dir=(-0.7903725294702839, 0, 0.6126265295094111)), keep=Keep.TOP, mode=Mode.PRIVATE)
    chamfer2_piece_12 = chamfer2_piece_12a & chamfer2_piece_12b
    add(chamfer2_piece_12, mode=Mode.SUBTRACT)

    # SurfaceCut1
    split(bisect_by=Plane.XY.offset(21.5), keep=Keep.BOTTOM)


solid = part.part
